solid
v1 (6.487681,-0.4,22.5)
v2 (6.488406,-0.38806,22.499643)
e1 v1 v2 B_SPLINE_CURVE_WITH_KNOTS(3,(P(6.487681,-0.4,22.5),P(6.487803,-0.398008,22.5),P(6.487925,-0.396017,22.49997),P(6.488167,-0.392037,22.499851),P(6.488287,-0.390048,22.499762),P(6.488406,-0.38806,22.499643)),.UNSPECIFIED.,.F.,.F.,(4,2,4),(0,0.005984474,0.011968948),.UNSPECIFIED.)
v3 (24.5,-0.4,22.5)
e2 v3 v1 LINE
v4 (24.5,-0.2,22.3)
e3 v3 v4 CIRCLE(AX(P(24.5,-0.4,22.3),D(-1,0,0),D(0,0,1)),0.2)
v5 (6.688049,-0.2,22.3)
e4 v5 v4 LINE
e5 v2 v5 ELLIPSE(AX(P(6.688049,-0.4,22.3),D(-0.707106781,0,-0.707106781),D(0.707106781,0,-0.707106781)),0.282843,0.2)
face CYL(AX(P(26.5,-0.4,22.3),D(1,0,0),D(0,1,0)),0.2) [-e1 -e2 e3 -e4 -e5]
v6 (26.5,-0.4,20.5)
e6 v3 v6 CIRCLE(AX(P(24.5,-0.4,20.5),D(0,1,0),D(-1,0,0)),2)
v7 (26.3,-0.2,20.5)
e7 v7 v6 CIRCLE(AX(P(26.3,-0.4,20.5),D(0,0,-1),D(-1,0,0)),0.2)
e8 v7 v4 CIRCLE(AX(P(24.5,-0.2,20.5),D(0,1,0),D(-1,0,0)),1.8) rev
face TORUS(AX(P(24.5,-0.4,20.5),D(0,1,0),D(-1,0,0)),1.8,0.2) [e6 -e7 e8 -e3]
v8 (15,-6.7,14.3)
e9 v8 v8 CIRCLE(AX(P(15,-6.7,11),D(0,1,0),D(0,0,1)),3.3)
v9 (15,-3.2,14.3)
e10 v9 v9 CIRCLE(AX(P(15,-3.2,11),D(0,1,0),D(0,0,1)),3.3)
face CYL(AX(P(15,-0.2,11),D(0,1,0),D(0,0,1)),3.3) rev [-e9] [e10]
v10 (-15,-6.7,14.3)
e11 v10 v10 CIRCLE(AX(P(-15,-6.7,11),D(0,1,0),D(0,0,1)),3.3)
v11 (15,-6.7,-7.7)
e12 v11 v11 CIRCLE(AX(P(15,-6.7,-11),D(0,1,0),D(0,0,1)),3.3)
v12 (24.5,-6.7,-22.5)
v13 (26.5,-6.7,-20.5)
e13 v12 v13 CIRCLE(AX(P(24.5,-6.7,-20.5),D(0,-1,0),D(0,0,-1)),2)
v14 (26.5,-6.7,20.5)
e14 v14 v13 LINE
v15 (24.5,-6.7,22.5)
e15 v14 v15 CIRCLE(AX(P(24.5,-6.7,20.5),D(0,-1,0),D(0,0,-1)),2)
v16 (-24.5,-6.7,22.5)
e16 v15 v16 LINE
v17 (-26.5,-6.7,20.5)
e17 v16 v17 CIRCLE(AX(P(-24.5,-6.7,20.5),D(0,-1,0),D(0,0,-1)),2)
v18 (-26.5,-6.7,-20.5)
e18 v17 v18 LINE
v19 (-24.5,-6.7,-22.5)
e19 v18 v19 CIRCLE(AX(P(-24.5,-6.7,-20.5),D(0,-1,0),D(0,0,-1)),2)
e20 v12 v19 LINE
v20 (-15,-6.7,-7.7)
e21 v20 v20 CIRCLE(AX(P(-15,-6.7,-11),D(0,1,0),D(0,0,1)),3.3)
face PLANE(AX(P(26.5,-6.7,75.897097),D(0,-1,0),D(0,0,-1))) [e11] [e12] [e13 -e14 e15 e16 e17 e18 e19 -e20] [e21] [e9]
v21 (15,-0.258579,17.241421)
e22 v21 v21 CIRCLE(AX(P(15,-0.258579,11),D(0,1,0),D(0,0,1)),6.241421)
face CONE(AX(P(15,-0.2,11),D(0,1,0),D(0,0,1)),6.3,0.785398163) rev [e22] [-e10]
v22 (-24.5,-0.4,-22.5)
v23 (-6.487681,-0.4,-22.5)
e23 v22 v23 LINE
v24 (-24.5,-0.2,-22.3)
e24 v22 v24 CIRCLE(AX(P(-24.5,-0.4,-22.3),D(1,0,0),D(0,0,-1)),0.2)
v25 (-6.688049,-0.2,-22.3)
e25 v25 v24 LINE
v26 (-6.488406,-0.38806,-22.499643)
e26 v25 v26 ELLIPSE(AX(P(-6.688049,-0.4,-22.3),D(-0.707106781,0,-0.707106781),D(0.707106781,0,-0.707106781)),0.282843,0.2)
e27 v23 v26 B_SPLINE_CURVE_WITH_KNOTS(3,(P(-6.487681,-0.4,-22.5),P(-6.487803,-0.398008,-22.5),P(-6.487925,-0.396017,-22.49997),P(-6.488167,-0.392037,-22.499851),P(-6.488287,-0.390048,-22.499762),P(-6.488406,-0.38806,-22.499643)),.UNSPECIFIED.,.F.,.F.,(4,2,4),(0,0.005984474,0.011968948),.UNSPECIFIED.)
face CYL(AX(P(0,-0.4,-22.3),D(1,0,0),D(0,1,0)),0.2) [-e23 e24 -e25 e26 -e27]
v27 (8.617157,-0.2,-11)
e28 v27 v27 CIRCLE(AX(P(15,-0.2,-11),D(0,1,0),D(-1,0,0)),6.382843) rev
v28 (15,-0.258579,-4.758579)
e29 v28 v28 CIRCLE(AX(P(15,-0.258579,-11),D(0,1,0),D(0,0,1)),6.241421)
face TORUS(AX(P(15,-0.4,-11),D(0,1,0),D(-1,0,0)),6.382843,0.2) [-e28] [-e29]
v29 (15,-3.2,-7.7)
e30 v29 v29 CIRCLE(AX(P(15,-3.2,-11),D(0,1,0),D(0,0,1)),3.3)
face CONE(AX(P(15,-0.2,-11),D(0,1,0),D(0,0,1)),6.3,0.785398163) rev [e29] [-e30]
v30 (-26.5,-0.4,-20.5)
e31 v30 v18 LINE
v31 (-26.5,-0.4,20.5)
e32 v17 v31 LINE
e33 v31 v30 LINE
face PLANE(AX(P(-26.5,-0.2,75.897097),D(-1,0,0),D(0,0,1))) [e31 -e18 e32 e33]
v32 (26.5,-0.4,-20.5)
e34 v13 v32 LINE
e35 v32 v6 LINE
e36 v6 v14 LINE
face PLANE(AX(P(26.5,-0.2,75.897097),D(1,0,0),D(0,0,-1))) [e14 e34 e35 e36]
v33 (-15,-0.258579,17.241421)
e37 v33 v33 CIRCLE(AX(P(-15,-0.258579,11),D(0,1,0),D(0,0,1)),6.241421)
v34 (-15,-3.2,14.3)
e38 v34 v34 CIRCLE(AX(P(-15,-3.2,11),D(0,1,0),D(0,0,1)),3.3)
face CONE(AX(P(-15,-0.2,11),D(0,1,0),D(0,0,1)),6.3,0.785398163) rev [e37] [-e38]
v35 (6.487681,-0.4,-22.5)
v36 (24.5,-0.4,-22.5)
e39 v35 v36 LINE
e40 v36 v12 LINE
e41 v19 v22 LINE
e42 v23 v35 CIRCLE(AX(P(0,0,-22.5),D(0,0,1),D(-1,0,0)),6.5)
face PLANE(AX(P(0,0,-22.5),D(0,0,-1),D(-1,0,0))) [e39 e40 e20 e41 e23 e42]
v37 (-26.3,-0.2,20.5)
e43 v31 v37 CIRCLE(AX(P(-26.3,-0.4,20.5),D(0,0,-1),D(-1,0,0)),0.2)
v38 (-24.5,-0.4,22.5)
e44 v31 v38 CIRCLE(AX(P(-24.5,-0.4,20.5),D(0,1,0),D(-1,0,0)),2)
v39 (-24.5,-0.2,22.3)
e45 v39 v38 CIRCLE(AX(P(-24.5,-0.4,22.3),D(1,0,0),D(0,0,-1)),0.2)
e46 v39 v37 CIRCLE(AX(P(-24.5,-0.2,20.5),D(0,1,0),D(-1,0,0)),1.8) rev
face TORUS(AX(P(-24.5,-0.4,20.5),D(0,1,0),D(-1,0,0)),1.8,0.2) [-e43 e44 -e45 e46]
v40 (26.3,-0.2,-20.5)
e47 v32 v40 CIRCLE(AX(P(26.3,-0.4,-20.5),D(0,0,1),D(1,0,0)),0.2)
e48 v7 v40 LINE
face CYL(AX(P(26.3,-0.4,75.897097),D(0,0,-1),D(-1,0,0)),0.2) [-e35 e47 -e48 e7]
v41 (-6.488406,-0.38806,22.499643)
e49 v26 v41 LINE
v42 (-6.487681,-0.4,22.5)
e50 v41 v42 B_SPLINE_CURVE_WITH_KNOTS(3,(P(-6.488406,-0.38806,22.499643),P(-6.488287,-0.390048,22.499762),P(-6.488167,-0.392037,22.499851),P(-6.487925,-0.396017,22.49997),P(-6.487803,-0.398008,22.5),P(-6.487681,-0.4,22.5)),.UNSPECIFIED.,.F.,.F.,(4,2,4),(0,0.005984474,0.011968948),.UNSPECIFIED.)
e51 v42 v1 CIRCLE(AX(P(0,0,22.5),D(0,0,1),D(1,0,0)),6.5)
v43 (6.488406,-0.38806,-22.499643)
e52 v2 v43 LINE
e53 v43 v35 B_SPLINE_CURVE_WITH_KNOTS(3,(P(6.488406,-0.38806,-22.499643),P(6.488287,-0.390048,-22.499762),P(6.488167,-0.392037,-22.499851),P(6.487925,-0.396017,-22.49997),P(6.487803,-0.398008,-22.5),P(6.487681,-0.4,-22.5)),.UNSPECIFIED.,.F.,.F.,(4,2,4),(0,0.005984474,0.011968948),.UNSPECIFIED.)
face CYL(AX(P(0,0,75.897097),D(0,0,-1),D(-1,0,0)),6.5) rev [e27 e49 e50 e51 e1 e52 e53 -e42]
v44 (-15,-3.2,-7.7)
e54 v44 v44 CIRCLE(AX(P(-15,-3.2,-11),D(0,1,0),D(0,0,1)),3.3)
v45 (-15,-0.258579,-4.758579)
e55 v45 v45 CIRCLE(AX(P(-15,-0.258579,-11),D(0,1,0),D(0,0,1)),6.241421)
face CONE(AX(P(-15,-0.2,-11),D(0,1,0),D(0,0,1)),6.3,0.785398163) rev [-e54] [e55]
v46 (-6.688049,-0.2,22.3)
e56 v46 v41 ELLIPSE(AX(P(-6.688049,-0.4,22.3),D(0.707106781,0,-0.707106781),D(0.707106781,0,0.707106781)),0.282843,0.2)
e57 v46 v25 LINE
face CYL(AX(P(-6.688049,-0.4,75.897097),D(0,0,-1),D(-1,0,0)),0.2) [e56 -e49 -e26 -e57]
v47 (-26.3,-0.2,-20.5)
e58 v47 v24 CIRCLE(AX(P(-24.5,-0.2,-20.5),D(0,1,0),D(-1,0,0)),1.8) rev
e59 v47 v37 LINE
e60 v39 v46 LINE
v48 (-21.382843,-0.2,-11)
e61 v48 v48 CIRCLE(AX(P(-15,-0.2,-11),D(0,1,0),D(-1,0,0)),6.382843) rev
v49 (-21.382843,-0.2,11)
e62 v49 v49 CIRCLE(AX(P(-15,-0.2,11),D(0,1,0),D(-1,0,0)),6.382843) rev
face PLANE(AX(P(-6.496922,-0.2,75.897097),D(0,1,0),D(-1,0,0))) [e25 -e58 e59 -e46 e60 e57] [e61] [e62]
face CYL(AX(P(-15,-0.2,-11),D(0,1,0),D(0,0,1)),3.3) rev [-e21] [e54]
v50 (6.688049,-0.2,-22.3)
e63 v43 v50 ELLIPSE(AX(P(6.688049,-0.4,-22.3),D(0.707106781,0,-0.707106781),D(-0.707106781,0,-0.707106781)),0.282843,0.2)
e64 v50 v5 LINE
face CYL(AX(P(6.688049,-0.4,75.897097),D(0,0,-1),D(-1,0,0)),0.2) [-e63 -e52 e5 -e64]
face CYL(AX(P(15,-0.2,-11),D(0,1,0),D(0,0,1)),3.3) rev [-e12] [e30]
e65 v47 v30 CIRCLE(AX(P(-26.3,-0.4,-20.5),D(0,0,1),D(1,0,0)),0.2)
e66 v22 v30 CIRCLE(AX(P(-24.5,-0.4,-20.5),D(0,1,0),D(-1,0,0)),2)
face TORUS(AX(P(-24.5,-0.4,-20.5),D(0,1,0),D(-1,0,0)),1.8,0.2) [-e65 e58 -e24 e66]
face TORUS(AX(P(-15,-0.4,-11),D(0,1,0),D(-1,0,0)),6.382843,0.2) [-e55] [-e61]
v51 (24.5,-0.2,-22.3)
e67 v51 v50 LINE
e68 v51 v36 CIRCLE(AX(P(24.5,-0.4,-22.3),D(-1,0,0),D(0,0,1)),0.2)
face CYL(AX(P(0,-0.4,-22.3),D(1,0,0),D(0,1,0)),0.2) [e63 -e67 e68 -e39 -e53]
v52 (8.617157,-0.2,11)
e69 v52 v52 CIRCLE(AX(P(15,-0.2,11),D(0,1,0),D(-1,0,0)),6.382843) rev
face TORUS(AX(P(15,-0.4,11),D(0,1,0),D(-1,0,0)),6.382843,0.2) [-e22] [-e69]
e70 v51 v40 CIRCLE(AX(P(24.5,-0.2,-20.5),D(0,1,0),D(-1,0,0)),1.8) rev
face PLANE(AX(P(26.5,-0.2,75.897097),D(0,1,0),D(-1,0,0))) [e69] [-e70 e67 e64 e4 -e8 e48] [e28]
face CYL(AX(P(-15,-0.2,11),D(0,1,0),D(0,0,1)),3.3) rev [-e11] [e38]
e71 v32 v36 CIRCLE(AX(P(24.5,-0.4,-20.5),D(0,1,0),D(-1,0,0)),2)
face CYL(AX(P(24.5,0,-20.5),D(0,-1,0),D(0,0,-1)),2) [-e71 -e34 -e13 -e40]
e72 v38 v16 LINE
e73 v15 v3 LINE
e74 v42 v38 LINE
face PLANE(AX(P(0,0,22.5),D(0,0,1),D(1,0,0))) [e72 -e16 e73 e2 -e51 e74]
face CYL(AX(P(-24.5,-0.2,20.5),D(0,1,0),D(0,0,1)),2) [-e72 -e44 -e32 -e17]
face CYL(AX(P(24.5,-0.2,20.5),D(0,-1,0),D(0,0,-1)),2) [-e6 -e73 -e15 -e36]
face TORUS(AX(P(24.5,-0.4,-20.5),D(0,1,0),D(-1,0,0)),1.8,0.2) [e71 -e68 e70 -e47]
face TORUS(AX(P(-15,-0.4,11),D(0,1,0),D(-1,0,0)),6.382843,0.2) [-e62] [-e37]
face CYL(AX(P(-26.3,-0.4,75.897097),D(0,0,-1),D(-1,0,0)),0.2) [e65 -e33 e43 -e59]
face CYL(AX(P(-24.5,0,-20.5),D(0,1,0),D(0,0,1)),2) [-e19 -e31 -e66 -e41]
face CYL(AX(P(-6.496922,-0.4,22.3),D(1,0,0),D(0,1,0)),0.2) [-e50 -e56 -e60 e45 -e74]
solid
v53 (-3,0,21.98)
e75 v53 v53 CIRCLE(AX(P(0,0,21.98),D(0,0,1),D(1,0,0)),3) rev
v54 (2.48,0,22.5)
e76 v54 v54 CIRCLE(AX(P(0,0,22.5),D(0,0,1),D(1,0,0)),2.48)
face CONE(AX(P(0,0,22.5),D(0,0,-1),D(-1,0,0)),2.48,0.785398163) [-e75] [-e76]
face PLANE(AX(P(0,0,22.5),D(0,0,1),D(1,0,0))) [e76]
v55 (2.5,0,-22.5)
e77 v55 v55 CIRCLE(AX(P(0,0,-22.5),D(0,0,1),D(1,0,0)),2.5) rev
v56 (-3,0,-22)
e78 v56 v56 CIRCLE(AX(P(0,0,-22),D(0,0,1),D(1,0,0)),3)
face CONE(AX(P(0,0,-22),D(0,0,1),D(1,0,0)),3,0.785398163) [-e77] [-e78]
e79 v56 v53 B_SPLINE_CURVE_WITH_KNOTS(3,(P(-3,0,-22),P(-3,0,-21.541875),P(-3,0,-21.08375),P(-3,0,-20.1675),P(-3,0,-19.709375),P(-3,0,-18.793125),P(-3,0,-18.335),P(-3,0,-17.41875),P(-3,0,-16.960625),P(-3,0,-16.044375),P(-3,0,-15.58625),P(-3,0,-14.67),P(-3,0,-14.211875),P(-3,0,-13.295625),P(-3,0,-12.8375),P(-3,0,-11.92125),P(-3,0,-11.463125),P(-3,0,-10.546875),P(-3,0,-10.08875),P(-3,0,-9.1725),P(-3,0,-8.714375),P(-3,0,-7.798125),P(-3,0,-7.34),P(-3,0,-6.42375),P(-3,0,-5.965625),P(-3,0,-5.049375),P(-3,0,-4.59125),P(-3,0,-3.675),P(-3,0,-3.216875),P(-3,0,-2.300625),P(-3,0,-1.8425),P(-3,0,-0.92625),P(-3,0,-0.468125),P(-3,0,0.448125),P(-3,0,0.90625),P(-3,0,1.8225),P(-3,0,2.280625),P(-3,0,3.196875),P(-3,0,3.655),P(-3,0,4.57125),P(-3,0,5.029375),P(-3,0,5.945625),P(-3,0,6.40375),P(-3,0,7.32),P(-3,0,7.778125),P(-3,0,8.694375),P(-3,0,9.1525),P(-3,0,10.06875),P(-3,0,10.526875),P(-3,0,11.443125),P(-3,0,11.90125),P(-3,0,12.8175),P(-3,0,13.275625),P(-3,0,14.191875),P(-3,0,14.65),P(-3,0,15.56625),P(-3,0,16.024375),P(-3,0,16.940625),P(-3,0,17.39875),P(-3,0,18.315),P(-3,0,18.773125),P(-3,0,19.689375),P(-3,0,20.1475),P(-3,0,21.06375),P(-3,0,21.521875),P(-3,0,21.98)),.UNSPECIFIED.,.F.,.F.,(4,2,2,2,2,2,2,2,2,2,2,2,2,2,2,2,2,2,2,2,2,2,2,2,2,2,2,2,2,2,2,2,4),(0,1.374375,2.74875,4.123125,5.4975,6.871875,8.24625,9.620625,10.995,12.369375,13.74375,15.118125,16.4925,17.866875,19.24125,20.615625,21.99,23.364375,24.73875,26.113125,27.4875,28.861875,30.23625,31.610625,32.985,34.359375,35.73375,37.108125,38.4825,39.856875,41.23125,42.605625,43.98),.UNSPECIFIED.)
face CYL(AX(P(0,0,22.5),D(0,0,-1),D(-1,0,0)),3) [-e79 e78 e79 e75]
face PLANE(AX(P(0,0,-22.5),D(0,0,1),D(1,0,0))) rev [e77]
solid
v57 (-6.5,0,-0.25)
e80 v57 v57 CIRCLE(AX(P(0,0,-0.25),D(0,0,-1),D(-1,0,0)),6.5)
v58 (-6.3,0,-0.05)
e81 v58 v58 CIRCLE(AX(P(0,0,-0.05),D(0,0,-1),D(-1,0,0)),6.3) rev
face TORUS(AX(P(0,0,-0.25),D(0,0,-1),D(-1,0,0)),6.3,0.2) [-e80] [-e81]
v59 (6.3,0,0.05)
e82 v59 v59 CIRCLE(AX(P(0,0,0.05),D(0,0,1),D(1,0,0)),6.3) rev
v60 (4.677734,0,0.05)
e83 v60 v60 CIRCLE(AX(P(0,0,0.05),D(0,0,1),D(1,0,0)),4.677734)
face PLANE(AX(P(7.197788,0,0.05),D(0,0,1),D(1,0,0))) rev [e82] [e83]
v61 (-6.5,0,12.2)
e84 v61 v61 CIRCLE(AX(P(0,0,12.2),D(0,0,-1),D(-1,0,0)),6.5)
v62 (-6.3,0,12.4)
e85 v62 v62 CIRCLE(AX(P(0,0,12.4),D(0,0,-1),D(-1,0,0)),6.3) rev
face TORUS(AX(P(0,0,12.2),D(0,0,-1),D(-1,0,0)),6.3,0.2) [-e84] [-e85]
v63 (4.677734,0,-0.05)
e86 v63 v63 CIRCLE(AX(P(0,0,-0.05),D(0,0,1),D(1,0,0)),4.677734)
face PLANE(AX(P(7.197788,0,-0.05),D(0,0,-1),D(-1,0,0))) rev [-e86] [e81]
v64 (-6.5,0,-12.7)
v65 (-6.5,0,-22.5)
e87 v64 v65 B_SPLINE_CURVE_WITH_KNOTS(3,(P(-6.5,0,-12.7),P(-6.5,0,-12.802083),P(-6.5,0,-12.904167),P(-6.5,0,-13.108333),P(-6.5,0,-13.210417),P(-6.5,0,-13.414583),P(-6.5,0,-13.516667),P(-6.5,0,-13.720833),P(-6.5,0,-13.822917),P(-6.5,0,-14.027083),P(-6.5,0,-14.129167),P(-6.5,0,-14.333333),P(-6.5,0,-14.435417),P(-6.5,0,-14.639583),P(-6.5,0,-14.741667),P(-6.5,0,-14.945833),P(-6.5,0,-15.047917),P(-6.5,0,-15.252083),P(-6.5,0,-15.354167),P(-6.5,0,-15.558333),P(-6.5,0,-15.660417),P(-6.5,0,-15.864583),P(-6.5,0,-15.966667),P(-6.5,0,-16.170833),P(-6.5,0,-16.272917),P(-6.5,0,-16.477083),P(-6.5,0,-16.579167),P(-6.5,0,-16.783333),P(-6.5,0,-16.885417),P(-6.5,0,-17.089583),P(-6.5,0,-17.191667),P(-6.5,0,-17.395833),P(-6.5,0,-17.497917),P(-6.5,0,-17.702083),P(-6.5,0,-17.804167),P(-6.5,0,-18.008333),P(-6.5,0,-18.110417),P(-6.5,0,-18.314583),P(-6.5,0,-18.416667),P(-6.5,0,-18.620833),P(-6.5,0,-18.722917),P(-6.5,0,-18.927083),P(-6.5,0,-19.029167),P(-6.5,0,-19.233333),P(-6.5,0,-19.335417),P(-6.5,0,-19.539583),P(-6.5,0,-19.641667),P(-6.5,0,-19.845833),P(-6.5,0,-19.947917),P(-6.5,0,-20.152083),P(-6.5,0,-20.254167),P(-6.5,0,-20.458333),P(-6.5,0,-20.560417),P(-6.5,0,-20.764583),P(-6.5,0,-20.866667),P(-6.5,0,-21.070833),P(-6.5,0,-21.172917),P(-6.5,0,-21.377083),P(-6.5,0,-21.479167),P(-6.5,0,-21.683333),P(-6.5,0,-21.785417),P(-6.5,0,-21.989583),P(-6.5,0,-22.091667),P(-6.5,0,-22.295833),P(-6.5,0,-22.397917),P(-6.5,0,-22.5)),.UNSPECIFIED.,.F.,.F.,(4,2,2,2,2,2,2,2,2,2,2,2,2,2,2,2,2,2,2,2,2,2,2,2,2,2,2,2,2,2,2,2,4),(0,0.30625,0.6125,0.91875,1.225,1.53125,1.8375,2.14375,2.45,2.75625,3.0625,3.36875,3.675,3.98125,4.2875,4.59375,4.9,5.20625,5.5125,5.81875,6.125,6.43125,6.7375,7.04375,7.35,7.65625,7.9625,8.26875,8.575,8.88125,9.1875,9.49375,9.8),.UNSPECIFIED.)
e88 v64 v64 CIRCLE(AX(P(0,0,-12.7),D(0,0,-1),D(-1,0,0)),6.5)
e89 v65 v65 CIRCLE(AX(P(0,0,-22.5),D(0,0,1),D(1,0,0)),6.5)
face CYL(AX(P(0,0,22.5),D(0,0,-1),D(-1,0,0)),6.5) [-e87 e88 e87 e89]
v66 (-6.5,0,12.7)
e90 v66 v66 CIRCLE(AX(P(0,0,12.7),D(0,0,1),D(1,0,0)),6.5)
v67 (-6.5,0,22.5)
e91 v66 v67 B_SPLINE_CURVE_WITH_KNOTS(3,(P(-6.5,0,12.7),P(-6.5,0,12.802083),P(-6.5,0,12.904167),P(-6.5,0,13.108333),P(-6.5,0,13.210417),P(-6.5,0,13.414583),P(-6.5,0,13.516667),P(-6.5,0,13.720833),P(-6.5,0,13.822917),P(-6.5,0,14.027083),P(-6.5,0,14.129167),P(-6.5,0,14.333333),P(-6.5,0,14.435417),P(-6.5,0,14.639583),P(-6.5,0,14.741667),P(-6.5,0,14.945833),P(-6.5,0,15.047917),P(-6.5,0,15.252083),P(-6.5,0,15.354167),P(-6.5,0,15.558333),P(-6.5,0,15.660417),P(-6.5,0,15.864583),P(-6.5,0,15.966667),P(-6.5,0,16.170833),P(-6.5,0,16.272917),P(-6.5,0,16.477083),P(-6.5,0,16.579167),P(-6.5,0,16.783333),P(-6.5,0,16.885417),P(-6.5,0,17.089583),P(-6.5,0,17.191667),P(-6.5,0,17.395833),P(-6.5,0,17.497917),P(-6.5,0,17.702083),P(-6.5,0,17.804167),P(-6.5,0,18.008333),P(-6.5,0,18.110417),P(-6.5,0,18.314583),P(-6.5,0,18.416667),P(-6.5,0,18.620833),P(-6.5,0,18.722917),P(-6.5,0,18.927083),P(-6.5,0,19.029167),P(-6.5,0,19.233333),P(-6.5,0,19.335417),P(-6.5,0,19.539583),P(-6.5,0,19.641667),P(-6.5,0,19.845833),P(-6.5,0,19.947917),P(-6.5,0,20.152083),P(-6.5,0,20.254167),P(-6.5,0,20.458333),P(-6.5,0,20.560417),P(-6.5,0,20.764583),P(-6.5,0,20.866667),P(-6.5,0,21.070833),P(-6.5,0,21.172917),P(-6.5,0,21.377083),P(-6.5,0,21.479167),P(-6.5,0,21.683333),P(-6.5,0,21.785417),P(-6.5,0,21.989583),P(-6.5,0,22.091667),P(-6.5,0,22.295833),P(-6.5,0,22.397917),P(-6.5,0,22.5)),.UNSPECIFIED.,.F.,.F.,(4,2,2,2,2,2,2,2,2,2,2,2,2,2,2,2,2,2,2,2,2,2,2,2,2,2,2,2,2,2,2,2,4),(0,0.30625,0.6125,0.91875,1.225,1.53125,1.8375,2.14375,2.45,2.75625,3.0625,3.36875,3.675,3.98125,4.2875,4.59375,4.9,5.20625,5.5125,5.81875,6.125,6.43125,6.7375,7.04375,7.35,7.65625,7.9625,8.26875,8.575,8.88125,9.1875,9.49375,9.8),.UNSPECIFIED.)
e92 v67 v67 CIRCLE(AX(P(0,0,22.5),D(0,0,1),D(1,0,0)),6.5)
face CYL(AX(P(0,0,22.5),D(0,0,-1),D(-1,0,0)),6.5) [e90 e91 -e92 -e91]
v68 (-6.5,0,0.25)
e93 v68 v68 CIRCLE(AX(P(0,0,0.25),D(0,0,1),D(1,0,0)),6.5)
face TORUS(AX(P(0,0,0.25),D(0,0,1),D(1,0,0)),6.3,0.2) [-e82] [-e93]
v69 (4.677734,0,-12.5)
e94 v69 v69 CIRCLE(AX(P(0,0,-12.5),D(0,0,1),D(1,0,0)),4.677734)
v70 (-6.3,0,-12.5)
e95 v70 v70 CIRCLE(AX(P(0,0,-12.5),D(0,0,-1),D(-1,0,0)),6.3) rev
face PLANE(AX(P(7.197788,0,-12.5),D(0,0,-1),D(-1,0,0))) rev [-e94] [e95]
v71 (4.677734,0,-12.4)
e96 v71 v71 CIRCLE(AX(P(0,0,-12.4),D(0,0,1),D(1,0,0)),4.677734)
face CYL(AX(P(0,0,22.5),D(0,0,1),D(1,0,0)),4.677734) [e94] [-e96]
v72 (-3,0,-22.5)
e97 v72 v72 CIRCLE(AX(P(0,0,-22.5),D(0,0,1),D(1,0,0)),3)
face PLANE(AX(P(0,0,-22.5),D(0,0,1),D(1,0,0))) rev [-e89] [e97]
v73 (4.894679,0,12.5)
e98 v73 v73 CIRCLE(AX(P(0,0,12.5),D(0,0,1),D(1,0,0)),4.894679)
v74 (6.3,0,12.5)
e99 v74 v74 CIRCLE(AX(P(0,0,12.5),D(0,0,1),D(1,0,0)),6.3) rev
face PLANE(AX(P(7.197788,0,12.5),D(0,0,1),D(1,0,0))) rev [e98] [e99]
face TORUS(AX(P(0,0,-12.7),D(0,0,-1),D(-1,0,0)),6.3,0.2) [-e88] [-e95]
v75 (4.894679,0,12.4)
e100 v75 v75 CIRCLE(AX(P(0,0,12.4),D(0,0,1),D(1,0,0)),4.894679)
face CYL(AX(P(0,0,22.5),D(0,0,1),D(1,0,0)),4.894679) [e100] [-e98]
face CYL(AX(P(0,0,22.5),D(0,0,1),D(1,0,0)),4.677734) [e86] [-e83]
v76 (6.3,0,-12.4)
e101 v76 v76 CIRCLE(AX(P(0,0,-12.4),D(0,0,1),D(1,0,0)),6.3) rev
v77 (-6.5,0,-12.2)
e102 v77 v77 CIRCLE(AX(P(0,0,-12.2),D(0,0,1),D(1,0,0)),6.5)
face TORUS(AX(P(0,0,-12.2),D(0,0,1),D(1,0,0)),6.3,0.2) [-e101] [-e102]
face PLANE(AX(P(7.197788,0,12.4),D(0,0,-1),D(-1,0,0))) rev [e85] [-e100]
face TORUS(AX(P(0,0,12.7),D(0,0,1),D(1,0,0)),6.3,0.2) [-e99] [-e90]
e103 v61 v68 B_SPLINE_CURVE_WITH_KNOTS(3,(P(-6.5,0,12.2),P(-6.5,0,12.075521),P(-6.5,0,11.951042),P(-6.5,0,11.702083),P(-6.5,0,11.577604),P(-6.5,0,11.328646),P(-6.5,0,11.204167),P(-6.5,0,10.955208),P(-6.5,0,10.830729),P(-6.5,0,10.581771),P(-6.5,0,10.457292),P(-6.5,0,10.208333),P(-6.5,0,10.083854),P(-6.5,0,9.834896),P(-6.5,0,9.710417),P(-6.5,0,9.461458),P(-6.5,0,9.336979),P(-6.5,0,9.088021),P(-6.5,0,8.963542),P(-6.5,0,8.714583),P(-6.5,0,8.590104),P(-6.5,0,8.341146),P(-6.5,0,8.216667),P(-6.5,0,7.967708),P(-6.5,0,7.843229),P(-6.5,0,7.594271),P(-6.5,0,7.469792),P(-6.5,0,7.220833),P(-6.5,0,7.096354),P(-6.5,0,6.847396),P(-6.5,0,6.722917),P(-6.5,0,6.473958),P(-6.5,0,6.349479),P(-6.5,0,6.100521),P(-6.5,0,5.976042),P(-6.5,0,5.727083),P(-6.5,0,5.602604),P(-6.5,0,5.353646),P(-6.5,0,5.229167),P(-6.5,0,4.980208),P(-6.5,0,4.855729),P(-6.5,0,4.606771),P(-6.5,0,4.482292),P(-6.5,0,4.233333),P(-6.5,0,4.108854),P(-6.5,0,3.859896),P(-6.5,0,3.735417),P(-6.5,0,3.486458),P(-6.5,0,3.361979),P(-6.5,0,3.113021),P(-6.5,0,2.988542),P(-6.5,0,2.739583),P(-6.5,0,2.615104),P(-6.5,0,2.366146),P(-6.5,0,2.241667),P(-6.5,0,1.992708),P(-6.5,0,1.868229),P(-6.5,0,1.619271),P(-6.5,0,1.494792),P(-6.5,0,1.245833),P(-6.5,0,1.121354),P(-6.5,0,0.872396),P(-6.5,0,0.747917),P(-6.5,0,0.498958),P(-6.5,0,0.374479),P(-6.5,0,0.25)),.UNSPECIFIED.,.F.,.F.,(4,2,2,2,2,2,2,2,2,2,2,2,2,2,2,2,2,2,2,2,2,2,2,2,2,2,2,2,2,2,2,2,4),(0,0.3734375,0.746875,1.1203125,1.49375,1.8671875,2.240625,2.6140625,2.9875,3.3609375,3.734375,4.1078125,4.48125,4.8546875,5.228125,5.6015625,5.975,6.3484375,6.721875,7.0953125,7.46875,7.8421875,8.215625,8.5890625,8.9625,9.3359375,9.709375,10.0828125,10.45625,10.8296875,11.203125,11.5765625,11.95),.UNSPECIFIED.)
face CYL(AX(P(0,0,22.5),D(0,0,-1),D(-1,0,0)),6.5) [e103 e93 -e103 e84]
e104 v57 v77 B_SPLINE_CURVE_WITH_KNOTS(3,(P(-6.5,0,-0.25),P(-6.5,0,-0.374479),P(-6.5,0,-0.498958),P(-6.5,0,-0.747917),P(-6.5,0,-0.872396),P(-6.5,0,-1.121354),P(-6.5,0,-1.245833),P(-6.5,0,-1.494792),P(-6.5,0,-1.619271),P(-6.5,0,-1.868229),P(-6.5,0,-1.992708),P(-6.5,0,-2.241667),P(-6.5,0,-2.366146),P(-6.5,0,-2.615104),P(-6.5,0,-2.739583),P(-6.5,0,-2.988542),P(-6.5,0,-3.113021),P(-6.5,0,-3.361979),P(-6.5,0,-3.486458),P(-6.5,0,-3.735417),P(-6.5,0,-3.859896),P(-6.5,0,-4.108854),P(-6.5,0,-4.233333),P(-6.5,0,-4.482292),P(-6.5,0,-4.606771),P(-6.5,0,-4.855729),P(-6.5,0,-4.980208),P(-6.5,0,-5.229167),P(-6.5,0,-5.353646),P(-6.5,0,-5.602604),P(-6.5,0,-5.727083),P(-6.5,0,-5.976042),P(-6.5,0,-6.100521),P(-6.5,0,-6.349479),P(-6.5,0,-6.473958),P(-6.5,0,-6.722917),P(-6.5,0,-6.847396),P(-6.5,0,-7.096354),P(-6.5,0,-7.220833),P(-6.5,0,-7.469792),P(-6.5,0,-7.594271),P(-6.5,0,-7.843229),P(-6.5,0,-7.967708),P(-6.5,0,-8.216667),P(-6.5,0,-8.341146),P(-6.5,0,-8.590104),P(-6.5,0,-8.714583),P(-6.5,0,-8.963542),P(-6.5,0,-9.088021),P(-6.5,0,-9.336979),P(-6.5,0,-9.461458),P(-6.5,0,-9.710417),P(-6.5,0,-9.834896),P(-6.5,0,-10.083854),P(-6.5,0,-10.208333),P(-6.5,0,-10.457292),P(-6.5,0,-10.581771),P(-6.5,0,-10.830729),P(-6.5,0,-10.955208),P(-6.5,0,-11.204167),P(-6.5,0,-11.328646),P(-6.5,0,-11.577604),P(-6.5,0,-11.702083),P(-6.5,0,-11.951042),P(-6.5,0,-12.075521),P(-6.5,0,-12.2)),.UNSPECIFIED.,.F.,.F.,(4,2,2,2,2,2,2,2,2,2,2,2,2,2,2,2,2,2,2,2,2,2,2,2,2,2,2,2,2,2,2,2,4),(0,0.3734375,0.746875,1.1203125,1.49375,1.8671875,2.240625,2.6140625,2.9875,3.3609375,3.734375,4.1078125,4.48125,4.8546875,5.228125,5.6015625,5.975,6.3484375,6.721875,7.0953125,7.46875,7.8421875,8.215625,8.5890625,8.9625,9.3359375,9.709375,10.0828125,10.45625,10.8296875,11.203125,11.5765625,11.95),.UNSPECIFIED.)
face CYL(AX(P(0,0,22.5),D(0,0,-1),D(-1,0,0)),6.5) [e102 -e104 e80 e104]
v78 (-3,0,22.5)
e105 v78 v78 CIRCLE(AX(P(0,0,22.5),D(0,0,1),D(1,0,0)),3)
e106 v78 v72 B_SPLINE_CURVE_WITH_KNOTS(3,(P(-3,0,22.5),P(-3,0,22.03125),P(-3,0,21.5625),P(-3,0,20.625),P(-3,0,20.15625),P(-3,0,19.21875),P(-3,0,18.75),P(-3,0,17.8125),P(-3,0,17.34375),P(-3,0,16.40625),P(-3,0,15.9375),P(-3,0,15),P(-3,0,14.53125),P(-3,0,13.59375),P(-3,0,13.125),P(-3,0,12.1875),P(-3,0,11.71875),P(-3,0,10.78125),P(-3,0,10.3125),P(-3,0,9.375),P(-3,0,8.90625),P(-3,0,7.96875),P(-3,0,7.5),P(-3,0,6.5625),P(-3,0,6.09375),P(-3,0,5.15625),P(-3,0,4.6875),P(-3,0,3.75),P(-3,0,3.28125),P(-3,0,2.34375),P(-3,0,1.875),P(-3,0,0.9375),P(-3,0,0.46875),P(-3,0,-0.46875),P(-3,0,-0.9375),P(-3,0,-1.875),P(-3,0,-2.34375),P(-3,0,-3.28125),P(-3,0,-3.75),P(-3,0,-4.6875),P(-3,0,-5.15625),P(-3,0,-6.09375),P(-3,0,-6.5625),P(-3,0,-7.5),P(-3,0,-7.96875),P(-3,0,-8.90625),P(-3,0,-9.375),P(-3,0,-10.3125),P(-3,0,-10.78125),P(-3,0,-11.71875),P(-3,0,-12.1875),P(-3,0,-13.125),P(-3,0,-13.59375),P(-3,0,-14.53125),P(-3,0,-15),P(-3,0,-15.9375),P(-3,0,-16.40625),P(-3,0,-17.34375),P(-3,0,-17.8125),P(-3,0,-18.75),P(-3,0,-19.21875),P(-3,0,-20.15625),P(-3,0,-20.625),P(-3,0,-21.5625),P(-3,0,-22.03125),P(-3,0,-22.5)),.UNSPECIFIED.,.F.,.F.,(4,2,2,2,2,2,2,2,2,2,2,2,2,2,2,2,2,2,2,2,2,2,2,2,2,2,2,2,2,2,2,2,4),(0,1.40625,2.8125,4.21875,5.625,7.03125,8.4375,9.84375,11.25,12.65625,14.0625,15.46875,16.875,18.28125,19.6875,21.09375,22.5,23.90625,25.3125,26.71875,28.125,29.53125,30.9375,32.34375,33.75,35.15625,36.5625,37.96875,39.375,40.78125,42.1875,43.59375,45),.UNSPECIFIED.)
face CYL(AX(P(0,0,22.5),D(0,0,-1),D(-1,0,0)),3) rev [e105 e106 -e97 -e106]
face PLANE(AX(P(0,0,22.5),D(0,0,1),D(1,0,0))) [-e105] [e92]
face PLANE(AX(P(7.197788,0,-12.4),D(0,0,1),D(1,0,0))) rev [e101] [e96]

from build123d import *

# Parameters (mm, degrees)
SKETCH_1_R                  = 6.5
SKETCH_1_R_2                = 3
EXTRUDE_1_DEPTH             = 22.5
SKETCH_2_R                  = 3
EXTRUDE_2_DEPTH             = 22.5
CHAMFER_1_SIZE              = 0.52
SKETCH_3_W                  = 2.520053464
SKETCH_3_H                  = 0.1
SKETCH_3_W_2                = 2.303108133
FILLET_1_R                  = 0.2
EXTRUDE_6_DEPTH             = 45
HOLE_WIZARD_M6_1_AT_2_COUNT = 2
HOLE_WIZARD_M6_1_AT_2_PITCH = 30
HOLE_WIZARD_M6_1_AT_3_COUNT = 2
HOLE_WIZARD_M6_1_AT_3_PITCH = 22
HOLE_WIZARD_M6_1_AT_4_COUNT = 2
HOLE_WIZARD_M6_1_AT_4_PITCH = 37.202150475
FILLET_2_R                  = 0.2
FILLET_3_R                  = 2
CHAMFER_2_SIZE              = 0.5


with BuildPart() as part:
    # 草图1 → 凸台-拉伸1 (new, symmetric)
    with BuildSketch(Plane.XY):
        with Locations(Location((0, 0, 0), (0, 0, 180))):
            Circle(SKETCH_1_R)
        with Locations(Location((0, 0, 0), (0, 0, 180))):
            Circle(SKETCH_1_R_2, mode=Mode.SUBTRACT)
    extrude(amount=EXTRUDE_1_DEPTH, both=True)

    # 草图3 → 切除-旋转1 (revolve, cut)
    with BuildSketch(Plane(origin=(0, 0, 0), x_dir=(1, 0, 0), z_dir=(0, 1, 0)), mode=Mode.PRIVATE) as cut_revolve_1_sk:
        with Locations((5.937760795, 12.45)):
            Rectangle(SKETCH_3_W, SKETCH_3_H)
        with Locations((5.937760795, 0)):
            Rectangle(SKETCH_3_W, SKETCH_3_H)
        with Locations((6.04623346, -12.45)):
            Rectangle(SKETCH_3_W_2, SKETCH_3_H)
    revolve(cut_revolve_1_sk.sketch.rotate(Axis((0, 0, 22.5), (0, 0, -1)), 180), axis=Axis((0, 0, 22.5), (0, 0, -1)), mode=Mode.SUBTRACT)

    # 圆角1
    fillet_1_edges = [part.edges().sort_by_distance(p)[0] for p in [
        (6.5, 0, -12.4),
        (6.5, 0, -12.5),
        (6.5, 0, 0.05),
        (6.5, 0, -0.05),
        (6.5, 0, 12.5),
        (6.5, 0, 12.4),
    ]]
    fillet(fillet_1_edges, radius=FILLET_1_R)


with BuildPart() as body_2:
    # 草图2 → 凸台-拉伸2 (new, symmetric)
    with BuildSketch(Plane.XY):
        with Locations(Location((0, 0, 0), (0, 0, 180))):
            Circle(SKETCH_2_R)
    extrude(amount=EXTRUDE_2_DEPTH, both=True)

    # 倒角1
    chamfer_1_edges = [body_2.edges().sort_by_distance(p)[0] for p in [
        (3, 0, 22.5),
    ]]
    chamfer(chamfer_1_edges, length=CHAMFER_1_SIZE)

    # 倒角2
    chamfer_2_edges = [body_2.edges().sort_by_distance(p)[0] for p in [
        (3, 0, -22.5),
    ]]
    chamfer(chamfer_2_edges, length=CHAMFER_2_SIZE)


with BuildPart() as body_3:
    # 草图5 → 凸台-拉伸6 (new body)
    with BuildSketch(Plane(origin=(0, 0, -22.5), x_dir=(-1, 0, 0), z_dir=(0, 0, -1))):
        with BuildLine():
            Line((6.496922348, -0.2), (26.5, -0.2))
            Line((26.5, -0.2), (26.5, -6.7))
            Line((26.5, -6.7), (-26.5, -6.7))
            Line((-26.5, -6.7), (-26.5, -0.2))
            Line((-26.5, -0.2), (-6.496922348, -0.2))
            ThreePointArc((-6.496922348, -0.2), (0, -6.5), (6.496922348, -0.2))
        make_face()
    extrude(amount=-EXTRUDE_6_DEPTH)

    # 草图6 → M6 平头机械螺钉的锥形沉头孔1 (revolve, cut)
    with BuildSketch(Plane(origin=(-15, -0.2, -11), x_dir=(0, 0, 1), z_dir=(1, 0, 0))):
        Polygon((0, 0), (0, 6.5), (3.3, 6.5), (3.3, 3), (6.3, 0), align=None)
    hole_wizard_m6_1 = revolve(axis=Axis((-15, 6.15, -11), (0, -1, 0)), mode=Mode.SUBTRACT)

    # M6 平头机械螺钉的锥形沉头孔1 at 2: M6 平头机械螺钉的锥形沉头孔1 ×2
    with Locations(*[(i * HOLE_WIZARD_M6_1_AT_2_PITCH, 0, 0) for i in range(1, HOLE_WIZARD_M6_1_AT_2_COUNT)]):
        add(hole_wizard_m6_1, mode=Mode.SUBTRACT)

    # M6 平头机械螺钉的锥形沉头孔1 at 3: M6 平头机械螺钉的锥形沉头孔1 ×2
    with Locations(*[(0, 0, i * HOLE_WIZARD_M6_1_AT_3_PITCH) for i in range(1, HOLE_WIZARD_M6_1_AT_3_COUNT)]):
        add(hole_wizard_m6_1, mode=Mode.SUBTRACT)

    # M6 平头机械螺钉的锥形沉头孔1 at 4: M6 平头机械螺钉的锥形沉头孔1 ×2
    with Locations(*[Vector(0.8064049958557056, 0, 0.5913636636275175) * (i * HOLE_WIZARD_M6_1_AT_4_PITCH) for i in range(1, HOLE_WIZARD_M6_1_AT_4_COUNT)]):
        add(hole_wizard_m6_1, mode=Mode.SUBTRACT)

    # 圆角2
    fillet_2_edges = [body_3.edges().sort_by_distance(p)[0] for p in [
        (-16.498461174, -0.2, -22.5),
        (15, -0.2, 4.7),
        (16.498461174, -0.2, -22.5),
        (-15, -0.2, 4.7),
        (-26.5, -0.2, 0),
        (-16.498461174, -0.2, 22.5),
        (15, -0.2, -17.3),
        (-6.496922348, -0.2, 0),
        (6.496922348, -0.2, 0),
        (16.498461174, -0.2, 22.5),
        (26.5, -0.2, 0),
        (-15, -0.2, -17.3),
    ]]
    fillet(fillet_2_edges, radius=FILLET_2_R)

    # 圆角3
    # the kernel refuses this fillet: 2 mm, written as the material it takes off along each edge
    with BuildSketch(Plane(origin=(24.5, -0.2, 20.5), x_dir=(0, 0, 1), z_dir=(-1, 0, 0))) as fillet_3_piece_1:
        with BuildLine():
            CenterArc((1.8, -0.2), 0.2, 0, 90)
            Line((2, -0.2), (2, 0))
            Line((2, 0), (1.8, 0))
        make_face()
    revolve(axis=Axis((24.5, -0.2, 20.5), (0, 1, 0)), revolution_arc=90, mode=Mode.SUBTRACT)
    with BuildSketch(Plane(origin=(24.5, -0.2, -20.5), x_dir=(1, 0, 0), z_dir=(0, 0, 1))) as fillet_3_piece_2:
        with BuildLine():
            CenterArc((1.8, -0.2), 0.2, 0, 90)
            Line((2, -0.2), (2, 0))
            Line((2, 0), (1.8, 0))
        make_face()
    revolve(axis=Axis((24.5, -0.2, -20.5), (0, 1, 0)), revolution_arc=90, mode=Mode.SUBTRACT)
    with BuildSketch(Plane(origin=(-24.5, -0.2, 20.5), x_dir=(-1, 0, 0), z_dir=(0, 0, -1))) as fillet_3_piece_3:
        with BuildLine():
            CenterArc((1.8, -0.2), 0.2, 0, 90)
            Line((2, -0.2), (2, 0))
            Line((2, 0), (1.8, 0))
        make_face()
    revolve(axis=Axis((-24.5, -0.2, 20.5), (0, 1, 0)), revolution_arc=90, mode=Mode.SUBTRACT)
    with BuildSketch(Plane(origin=(-24.5, -0.2, -20.5), x_dir=(0, 0, -1), z_dir=(1, 0, 0))) as fillet_3_piece_4:
        with BuildLine():
            CenterArc((1.8, -0.2), 0.2, 0, 90)
            Line((2, -0.2), (2, 0))
            Line((2, 0), (1.8, 0))
        make_face()
    revolve(axis=Axis((-24.5, -0.2, -20.5), (0, 1, 0)), revolution_arc=90, mode=Mode.SUBTRACT)
    with BuildSketch(Plane(origin=(-26.5, -0.2, -22.5), x_dir=(1, 0, 0), z_dir=(0, -1, 0)), Plane(origin=(-26.5, -0.2, 22.5), x_dir=(0, 0, -1), z_dir=(0, -1, 0)), Plane(origin=(26.5, -11.7, -22.5), x_dir=(-1, 0, 0), z_dir=(0, 1, 0))) as fillet_3_piece_5:
        with BuildLine():
            CenterArc((FILLET_3_R, FILLET_3_R), FILLET_3_R, 180, 90)
            Line((0, FILLET_3_R), (0, 0))
            Line((0, 0), (FILLET_3_R, 0))
        make_face()
    extrude(amount=11.5, mode=Mode.SUBTRACT)
    with BuildSketch(Plane(origin=(26.5, -11.7, 22.5), x_dir=(-1, 0, 0), z_dir=(0, 1, 0))) as fillet_3_piece_6:
        with BuildLine():
            CenterArc((FILLET_3_R, -FILLET_3_R), FILLET_3_R, 90, 90)
            Line((0, -FILLET_3_R), (0, 0))
            Line((0, 0), (FILLET_3_R, 0))
        make_face()
    extrude(amount=11.5, mode=Mode.SUBTRACT)


solid = Compound([part.part, body_2.part, body_3.part])
